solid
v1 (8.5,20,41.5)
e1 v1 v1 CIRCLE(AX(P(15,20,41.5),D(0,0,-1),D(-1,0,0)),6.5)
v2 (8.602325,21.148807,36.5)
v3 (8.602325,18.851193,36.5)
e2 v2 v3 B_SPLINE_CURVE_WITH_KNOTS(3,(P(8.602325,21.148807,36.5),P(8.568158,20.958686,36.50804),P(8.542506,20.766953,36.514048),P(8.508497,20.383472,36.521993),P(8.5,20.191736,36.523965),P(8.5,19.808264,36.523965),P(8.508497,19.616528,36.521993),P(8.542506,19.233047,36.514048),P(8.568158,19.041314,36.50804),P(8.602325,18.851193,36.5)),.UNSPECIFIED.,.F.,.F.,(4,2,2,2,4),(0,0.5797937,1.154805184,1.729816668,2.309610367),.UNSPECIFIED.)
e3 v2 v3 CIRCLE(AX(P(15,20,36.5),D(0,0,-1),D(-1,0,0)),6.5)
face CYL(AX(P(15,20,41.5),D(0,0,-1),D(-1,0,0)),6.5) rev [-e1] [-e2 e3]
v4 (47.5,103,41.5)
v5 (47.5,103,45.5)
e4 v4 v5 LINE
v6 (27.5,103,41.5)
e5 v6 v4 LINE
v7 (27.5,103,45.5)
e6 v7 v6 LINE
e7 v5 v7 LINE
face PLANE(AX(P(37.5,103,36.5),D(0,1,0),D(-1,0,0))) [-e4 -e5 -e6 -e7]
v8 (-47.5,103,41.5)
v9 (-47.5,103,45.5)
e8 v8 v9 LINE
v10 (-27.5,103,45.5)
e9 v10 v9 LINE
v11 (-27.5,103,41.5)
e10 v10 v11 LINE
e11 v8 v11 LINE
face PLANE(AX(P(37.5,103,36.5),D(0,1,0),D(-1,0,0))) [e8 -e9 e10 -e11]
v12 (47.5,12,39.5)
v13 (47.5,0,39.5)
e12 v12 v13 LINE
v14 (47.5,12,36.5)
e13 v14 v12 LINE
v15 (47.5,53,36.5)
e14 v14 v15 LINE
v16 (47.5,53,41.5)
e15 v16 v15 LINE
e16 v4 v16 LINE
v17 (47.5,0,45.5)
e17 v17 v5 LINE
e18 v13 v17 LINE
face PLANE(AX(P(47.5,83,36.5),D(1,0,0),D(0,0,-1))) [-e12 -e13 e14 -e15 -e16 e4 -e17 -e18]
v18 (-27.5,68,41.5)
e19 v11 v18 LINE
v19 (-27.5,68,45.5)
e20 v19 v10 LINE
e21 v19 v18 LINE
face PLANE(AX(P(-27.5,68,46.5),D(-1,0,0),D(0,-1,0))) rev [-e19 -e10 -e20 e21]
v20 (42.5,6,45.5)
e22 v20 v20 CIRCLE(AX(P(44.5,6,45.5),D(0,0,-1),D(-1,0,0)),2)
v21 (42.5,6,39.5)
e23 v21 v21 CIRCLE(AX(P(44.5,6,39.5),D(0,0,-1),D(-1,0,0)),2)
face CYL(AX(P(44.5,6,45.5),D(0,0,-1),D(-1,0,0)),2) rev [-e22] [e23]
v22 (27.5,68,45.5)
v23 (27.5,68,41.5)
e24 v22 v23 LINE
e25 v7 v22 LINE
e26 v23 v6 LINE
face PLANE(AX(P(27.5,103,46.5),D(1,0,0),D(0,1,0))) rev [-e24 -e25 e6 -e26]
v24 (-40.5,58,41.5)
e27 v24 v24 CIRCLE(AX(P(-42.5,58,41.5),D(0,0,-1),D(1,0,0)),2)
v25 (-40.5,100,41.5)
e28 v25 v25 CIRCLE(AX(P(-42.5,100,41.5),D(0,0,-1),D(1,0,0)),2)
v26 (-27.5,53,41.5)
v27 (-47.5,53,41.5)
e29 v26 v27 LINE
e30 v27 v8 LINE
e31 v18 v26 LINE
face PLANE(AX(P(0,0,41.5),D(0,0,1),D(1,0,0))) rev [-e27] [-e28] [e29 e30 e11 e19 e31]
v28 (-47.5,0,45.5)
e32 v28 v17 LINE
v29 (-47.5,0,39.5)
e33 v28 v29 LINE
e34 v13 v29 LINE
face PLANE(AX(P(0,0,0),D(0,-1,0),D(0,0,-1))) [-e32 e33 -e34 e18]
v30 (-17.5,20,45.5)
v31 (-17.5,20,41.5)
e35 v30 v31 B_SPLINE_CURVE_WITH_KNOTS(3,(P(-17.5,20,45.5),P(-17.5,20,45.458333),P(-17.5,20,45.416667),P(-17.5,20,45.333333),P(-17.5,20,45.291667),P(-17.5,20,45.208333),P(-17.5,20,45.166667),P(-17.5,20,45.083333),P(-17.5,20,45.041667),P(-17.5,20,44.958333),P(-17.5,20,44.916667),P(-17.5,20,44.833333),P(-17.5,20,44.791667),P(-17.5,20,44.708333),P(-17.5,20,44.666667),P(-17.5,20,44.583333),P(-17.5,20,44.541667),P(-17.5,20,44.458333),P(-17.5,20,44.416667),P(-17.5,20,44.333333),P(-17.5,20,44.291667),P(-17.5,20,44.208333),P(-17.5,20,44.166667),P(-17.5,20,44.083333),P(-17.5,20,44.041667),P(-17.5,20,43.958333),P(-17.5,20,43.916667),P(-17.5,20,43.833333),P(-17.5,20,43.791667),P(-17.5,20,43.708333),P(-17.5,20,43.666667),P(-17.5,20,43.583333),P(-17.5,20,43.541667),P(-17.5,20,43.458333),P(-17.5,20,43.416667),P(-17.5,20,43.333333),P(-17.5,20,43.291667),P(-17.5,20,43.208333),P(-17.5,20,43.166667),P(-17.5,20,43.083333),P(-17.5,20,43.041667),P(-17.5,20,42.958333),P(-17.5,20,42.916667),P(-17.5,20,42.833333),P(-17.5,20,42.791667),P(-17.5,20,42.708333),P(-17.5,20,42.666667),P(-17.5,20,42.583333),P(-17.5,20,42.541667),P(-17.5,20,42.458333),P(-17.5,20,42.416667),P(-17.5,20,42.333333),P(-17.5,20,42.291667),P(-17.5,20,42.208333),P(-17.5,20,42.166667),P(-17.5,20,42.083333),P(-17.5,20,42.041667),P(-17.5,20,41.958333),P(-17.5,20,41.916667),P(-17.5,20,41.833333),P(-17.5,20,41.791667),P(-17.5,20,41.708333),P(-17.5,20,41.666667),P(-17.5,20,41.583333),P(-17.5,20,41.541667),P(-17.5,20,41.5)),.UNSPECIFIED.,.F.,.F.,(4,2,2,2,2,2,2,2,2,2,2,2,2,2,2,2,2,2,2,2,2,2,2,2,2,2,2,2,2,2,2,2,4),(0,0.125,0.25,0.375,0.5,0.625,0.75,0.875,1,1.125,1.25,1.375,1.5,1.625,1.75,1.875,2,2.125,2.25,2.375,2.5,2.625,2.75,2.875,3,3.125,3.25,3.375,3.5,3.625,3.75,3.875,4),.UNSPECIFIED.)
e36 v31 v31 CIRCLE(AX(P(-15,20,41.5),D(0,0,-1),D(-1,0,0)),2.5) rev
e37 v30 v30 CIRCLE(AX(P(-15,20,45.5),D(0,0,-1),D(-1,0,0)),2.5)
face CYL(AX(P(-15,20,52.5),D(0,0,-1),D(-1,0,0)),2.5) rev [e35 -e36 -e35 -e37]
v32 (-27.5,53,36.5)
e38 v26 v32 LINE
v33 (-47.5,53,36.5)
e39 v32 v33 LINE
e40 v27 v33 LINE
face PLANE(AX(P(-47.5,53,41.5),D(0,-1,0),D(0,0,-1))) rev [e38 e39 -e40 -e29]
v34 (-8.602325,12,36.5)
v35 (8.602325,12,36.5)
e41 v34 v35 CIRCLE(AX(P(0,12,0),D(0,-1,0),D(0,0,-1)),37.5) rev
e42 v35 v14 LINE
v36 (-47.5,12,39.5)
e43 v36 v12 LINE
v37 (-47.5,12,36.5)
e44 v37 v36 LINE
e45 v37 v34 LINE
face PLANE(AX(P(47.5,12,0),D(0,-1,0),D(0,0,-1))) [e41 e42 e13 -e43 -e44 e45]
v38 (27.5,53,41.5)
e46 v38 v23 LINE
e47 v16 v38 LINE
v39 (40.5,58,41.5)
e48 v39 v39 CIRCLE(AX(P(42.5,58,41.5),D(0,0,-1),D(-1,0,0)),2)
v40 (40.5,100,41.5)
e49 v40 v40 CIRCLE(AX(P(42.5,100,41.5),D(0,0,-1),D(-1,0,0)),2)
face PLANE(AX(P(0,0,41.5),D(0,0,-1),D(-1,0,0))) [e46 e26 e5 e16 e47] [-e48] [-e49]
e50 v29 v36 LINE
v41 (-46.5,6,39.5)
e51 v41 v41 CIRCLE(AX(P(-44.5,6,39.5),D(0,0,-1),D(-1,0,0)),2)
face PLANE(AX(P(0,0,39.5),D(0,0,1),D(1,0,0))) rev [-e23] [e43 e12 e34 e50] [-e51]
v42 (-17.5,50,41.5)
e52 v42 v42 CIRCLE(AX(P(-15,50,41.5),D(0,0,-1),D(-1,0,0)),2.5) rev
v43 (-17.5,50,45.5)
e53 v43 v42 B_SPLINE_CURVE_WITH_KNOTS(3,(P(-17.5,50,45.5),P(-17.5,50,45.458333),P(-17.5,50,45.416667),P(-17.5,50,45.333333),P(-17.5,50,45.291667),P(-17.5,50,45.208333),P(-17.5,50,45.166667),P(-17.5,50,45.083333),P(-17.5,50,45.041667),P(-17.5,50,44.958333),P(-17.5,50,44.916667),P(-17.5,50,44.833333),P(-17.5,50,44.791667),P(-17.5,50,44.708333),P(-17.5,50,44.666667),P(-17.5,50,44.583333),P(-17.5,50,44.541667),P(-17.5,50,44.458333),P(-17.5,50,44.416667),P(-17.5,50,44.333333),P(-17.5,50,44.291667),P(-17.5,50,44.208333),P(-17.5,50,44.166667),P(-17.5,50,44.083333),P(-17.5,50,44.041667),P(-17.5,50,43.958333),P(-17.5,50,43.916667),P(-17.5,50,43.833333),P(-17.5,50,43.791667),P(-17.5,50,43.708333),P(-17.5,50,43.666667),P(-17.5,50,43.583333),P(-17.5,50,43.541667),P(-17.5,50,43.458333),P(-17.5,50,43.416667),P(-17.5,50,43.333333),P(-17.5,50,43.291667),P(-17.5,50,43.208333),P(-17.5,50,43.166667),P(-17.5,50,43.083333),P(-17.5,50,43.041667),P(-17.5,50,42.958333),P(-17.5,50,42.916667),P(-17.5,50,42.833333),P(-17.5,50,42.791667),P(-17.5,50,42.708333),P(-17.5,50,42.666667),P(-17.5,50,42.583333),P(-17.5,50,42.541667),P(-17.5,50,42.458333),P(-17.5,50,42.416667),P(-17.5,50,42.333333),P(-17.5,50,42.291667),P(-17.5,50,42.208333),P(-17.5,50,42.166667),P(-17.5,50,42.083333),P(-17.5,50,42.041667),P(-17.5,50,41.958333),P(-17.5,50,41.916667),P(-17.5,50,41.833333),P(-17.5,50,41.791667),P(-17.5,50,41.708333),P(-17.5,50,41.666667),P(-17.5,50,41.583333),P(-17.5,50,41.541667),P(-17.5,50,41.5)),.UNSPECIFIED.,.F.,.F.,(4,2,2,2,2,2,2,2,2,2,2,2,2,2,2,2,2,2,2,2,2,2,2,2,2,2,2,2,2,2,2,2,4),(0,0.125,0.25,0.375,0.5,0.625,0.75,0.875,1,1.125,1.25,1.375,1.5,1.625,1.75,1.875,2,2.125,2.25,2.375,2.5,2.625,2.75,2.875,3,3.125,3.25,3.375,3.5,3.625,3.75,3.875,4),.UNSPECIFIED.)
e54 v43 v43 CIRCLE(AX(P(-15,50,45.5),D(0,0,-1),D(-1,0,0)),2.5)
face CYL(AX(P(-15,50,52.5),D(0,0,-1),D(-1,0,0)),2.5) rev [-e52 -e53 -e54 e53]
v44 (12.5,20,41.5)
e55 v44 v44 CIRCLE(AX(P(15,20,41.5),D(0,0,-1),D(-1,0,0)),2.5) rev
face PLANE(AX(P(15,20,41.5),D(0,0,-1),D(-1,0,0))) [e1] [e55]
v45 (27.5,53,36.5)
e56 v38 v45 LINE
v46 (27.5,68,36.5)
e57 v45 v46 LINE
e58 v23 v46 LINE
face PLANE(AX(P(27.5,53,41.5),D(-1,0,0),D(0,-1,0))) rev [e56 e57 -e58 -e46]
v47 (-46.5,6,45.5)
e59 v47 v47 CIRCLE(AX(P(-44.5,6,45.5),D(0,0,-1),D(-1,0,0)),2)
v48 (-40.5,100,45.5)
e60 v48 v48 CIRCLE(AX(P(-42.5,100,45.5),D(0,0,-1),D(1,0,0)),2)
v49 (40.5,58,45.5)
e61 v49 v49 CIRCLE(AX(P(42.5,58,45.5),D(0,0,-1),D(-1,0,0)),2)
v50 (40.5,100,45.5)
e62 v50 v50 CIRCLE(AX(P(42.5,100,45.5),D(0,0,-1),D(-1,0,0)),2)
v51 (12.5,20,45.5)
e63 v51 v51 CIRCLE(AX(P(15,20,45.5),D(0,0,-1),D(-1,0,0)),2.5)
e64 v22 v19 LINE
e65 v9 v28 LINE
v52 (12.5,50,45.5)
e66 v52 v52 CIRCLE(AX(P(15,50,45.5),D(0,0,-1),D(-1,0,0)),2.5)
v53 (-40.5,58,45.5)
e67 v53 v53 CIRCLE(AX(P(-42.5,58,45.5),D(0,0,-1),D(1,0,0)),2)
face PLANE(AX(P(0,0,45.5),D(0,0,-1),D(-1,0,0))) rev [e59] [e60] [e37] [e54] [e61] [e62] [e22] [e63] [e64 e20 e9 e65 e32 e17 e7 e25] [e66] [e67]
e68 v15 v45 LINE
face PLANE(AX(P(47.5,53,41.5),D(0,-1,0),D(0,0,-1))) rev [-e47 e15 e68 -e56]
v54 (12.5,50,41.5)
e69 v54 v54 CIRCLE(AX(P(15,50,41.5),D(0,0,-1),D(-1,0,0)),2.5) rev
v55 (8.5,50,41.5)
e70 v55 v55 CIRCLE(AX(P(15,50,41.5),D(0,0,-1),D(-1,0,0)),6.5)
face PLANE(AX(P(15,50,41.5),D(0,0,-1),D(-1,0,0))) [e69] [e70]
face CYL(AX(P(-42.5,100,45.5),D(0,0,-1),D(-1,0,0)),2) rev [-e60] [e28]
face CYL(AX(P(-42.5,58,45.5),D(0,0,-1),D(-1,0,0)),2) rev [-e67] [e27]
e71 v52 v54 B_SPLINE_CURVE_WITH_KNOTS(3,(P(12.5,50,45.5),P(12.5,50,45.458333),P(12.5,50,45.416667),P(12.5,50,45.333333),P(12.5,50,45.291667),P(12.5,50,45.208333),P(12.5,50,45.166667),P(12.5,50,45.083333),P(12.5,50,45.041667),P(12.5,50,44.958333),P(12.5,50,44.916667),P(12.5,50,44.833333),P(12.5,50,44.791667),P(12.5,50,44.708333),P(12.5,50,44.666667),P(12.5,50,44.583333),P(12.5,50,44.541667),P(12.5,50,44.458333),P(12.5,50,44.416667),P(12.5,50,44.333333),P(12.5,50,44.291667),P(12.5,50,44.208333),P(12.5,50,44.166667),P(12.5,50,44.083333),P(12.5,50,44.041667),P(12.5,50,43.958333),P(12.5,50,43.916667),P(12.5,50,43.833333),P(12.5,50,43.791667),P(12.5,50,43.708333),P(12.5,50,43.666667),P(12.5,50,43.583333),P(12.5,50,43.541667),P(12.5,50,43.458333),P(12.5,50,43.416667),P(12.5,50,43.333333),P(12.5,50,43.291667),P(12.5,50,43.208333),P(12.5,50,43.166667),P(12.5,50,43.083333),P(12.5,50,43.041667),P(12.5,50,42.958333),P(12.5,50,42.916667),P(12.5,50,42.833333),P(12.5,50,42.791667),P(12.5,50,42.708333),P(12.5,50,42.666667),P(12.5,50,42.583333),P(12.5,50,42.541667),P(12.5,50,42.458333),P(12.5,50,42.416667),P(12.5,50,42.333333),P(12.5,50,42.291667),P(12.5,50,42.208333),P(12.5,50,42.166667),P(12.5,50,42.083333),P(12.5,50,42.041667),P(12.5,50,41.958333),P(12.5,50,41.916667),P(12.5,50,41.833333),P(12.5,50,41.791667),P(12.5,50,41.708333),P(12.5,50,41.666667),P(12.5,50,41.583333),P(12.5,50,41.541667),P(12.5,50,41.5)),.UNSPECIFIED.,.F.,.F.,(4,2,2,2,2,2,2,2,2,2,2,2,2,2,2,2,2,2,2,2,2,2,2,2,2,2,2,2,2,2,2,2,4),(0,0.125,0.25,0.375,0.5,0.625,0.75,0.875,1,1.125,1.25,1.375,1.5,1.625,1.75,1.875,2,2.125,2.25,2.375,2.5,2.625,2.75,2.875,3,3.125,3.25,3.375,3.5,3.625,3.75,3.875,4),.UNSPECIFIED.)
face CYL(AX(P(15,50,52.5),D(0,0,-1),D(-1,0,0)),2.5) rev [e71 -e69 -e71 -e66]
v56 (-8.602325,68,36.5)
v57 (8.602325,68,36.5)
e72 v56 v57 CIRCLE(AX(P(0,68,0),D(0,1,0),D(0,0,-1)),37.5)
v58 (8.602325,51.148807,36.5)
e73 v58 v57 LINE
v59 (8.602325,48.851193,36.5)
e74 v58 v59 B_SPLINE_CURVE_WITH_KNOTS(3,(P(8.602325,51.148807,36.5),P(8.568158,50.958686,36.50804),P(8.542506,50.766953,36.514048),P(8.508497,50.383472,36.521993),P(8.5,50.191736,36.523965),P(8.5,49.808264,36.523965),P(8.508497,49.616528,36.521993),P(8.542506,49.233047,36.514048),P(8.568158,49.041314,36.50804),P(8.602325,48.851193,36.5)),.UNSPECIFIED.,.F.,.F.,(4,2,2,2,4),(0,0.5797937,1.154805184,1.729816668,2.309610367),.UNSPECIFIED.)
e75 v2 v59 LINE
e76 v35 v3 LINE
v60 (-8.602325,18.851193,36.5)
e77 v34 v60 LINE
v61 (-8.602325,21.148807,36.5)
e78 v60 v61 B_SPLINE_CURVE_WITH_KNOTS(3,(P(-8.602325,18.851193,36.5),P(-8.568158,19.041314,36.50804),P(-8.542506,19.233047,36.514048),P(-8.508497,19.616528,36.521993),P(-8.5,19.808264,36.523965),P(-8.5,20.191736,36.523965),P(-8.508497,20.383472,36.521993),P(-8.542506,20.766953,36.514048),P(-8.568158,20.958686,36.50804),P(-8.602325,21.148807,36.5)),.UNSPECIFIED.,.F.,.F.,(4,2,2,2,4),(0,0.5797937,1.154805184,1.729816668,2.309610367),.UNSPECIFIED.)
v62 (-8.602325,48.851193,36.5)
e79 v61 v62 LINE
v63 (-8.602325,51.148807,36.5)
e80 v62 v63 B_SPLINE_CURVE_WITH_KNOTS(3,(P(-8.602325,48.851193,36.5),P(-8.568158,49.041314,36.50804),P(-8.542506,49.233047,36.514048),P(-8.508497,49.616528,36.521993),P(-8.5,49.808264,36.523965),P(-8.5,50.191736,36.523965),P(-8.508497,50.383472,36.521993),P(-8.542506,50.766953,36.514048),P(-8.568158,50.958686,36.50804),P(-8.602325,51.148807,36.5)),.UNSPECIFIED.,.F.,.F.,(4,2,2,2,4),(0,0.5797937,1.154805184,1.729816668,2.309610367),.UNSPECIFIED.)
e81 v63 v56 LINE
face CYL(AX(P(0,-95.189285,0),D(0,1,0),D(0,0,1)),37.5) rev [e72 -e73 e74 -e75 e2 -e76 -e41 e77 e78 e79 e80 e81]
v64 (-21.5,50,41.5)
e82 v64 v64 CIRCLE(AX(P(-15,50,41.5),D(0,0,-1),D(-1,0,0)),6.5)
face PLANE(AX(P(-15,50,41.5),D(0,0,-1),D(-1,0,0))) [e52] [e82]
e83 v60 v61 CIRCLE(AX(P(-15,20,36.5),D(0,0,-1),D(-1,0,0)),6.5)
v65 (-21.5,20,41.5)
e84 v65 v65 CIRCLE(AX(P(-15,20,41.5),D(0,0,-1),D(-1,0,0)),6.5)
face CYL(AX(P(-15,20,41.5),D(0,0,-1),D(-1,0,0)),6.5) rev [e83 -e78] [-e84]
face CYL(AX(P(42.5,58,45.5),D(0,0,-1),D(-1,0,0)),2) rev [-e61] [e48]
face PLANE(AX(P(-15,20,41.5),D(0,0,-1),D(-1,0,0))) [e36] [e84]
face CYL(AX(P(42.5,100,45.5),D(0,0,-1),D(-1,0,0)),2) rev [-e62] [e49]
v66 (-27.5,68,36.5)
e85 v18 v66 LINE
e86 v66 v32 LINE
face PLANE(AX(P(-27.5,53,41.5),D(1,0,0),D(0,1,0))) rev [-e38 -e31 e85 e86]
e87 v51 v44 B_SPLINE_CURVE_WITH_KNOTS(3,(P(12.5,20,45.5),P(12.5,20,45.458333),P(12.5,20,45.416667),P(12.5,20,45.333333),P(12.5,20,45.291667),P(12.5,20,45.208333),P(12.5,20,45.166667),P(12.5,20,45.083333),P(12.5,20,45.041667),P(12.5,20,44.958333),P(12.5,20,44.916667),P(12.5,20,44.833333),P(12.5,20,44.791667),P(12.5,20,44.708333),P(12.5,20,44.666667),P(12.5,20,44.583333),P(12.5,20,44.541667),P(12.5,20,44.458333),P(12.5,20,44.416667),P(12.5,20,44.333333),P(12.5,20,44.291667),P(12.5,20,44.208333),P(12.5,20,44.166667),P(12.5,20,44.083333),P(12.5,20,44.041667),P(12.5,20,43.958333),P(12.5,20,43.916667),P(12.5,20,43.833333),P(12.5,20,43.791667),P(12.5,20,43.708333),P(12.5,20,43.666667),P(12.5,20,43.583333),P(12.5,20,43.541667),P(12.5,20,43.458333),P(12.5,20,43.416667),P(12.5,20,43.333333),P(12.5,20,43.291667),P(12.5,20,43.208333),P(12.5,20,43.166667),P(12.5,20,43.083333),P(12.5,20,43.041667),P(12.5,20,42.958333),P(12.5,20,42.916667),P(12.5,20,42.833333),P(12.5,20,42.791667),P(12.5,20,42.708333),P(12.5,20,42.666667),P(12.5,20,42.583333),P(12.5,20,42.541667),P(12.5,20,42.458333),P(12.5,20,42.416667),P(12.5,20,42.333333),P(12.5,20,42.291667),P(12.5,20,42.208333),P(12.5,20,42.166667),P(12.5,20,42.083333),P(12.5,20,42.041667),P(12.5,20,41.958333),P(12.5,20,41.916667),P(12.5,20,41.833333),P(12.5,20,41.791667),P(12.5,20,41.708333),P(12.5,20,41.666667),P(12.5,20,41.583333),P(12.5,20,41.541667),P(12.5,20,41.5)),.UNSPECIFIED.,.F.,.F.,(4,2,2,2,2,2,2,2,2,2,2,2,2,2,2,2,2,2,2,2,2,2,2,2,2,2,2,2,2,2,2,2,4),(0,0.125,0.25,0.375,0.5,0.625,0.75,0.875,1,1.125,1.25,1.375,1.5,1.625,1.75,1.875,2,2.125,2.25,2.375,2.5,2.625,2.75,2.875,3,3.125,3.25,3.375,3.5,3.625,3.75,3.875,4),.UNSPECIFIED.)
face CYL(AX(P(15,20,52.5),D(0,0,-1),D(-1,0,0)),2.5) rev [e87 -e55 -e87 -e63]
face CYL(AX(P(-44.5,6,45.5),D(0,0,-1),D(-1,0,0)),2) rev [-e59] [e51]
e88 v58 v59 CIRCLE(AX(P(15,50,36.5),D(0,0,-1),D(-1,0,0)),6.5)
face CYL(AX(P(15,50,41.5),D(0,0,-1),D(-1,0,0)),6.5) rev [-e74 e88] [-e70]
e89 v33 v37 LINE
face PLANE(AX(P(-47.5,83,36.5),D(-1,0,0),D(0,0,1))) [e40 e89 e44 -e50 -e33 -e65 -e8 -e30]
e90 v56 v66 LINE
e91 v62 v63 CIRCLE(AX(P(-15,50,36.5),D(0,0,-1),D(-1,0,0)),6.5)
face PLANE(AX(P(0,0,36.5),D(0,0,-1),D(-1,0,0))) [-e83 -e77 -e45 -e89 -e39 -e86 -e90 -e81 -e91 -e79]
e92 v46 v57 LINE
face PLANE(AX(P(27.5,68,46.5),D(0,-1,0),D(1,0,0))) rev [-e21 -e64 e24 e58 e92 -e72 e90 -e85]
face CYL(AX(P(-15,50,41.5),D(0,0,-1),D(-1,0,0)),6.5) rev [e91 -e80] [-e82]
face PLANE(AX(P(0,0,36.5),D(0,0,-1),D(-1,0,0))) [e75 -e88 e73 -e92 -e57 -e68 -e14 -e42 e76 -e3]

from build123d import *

# Parameters (mm, degrees)
SKETCH1_R                = 37.5
BOSS_EXTRUDE1_DEPTH      = 12
SKETCH2_R                = 30
BOSS_EXTRUDE2_DEPTH      = 56
BOSS_EXTRUDE3_DEPTH      = 5
BOSS_EXTRUDE3_DEPTH_BACK = 1
SKETCH4_W                = 75
SKETCH4_H                = 15
SKETCH4_R                = 3.5
MOVE_FACE3_BY            = 10
MOVE_FACE3_2_BY          = 10
BOSS_EXTRUDE4_DEPTH      = 12
BOSS_EXTRUDE5_DEPTH      = 68
MOVE_FACE1_BY            = 10
SKETCH11_W               = 95
SKETCH11_H               = 15
BOSS_EXTRUDE7_DEPTH      = 20
CUT_EXTRUDE1_DEPTH       = 103.720494547
CUT_EXTRUDE1_DEPTH_BACK  = 103.720494547
SKETCH12_R               = 2.5
SKETCH13_R               = 6.5
CUT_EXTRUDE2_DEPTH       = 5
MOVE_FACE2_BY            = 7
DELETEFACE1_START        = -20
DELETEFACE1_OUTLINE_W    = 95
DELETEFACE1_OUTLINE_H    = 8
DELETEFACE1_DEPTH        = 20
CUT_EXTRUDE3_DEPTH       = 103.359660059
CUT_EXTRUDE3_DEPTH_BACK  = 3
SKETCH15_R               = 2
CUT_EXTRUDE4_DEPTH       = 96.818839484
MOVE_FACE4_BY            = 20
SKETCH16_W               = 55
SKETCH16_H               = 35
CUT_EXTRUDE5_DEPTH       = 10
SKETCH17_W               = 20
SKETCH17_H               = 50
CUT_EXTRUDE6_DEPTH       = 5
SKETCH18_R               = 2
CUT_EXTRUDE7_DEPTH       = 114.535236825


# Read off the part's stored shape, not the designer's step: DeleteFace1
with BuildPart() as part:
    # Sketch1 → Boss-Extrude1 (new body)
    with BuildSketch(Plane(origin=(0, 0, 0), x_dir=(1, 0, 0), z_dir=(0, 1, 0))):
        with Locations(Location((0, 0, 0), (0, 0, 270))):
            Circle(SKETCH1_R)
    extrude(amount=BOSS_EXTRUDE1_DEPTH)

    # Sketch2 → Boss-Extrude2 (add)
    with BuildSketch(Plane(origin=(0, 12, 0), x_dir=(1, 0, 0), z_dir=(0, 1, 0))):
        with Locations(Location((0, 0, 0), (0, 0, 270))):
            Circle(SKETCH2_R)
    extrude(amount=BOSS_EXTRUDE2_DEPTH)


with BuildPart() as body_2:
    # Sketch4 → Boss-Extrude3 (new, two sides: drawn at the far end of the back side and taken through both)
    with BuildSketch(Plane.XY.offset(37.5).offset(-BOSS_EXTRUDE3_DEPTH_BACK)):
        with Locations((0, 75.5)):
            Rectangle(SKETCH4_W, SKETCH4_H)
        with Locations((0, 76)):
            Circle(SKETCH4_R, mode=Mode.SUBTRACT)
    extrude(amount=BOSS_EXTRUDE3_DEPTH + BOSS_EXTRUDE3_DEPTH_BACK)

    # Move Face3: a face moved outward by 10.0
    extrude(body_2.faces().sort_by_distance((-37.5, 75.5, 39.5))[0], amount=MOVE_FACE3_BY, dir=(-1, 0, 0))

    # Move Face3 2: a face moved outward by 10.0
    extrude(body_2.faces().sort_by_distance((37.5, 75.5, 39.5))[0], amount=MOVE_FACE3_2_BY, dir=(1, 0, 0))



with BuildPart() as body_3:
    # Sketch6 → Boss-Extrude4 (new body)
    with BuildSketch(Plane.XZ):
        with BuildLine():
            Line((42.5, 0), (37.5, 0))
            ThreePointArc((37.5, 0), (0, 37.5), (-37.5, 0))
            Line((-37.5, 0), (-42.5, 0))
            ThreePointArc((-42.5, 0), (0, 42.5), (42.5, 0))
        make_face()
    extrude(amount=-BOSS_EXTRUDE4_DEPTH)


with BuildPart() as body_2_1:
    add(body_2.part)

    add(body_3.part)  # Boss-Extrude5 merges body 3
    # Sketch7 → Boss-Extrude5 (add)
    with BuildSketch(Plane.XZ.offset(-68)):
        with BuildLine():
            Line((8.602325267, 36.5), (47.5, 36.5))
            Line((47.5, 36.5), (47.5, 42.5))
            Line((47.5, 42.5), (-47.5, 42.5))
            Line((-47.5, 42.5), (-47.5, 36.5))
            Line((-47.5, 36.5), (-8.602325267, 36.5))
            ThreePointArc((-8.602325267, 36.5), (0, 37.5), (8.602325267, 36.5))
        make_face()
    extrude(amount=BOSS_EXTRUDE5_DEPTH)

    # Move Face1: a face moved outward by 10.0
    extrude(body_2_1.faces().sort_by_distance((0, 41.330789145, 42.5))[0], amount=MOVE_FACE1_BY, dir=(0, 0, 1))

    # Sketch11 → Boss-Extrude7 (add)
    with BuildSketch(Plane.XZ):
        with Locations((0, 45)):
            Rectangle(SKETCH11_W, SKETCH11_H)
    extrude(amount=BOSS_EXTRUDE7_DEPTH)

    # Sketch12 → Cut-Extrude1 (cut, two sides: drawn at the far end of the back side and taken through both)
    with BuildSketch(Plane(origin=(0, 0, 37.5), x_dir=(-1, 0, 0), z_dir=(0, 0, -1)).offset(-CUT_EXTRUDE1_DEPTH_BACK)):
        with Locations((-15, 20)):
            Circle(SKETCH12_R)
        with Locations((15, 20)):
            Circle(SKETCH12_R)
        with Locations((-15, 50)):
            Circle(SKETCH12_R)
        with Locations((15, 50)):
            Circle(SKETCH12_R)
    extrude(amount=CUT_EXTRUDE1_DEPTH + CUT_EXTRUDE1_DEPTH_BACK, mode=Mode.SUBTRACT)

    # Sketch13 → Cut-Extrude2 (cut)
    with BuildSketch(Plane(origin=(0, 0, 36.5), x_dir=(-1, 0, 0), z_dir=(0, 0, -1))):
        with Locations((-15, 50)):
            Circle(SKETCH13_R)
        with Locations((15, 50)):
            Circle(SKETCH13_R)
        with Locations((-15, 20)):
            Circle(SKETCH13_R)
        with Locations((15, 20)):
            Circle(SKETCH13_R)
    extrude(amount=-CUT_EXTRUDE2_DEPTH, mode=Mode.SUBTRACT)

    # Move Face2: a face moved inward by 7.0
    extrude(body_2_1.faces().sort_by_distance((0, 31.294429556, 52.5))[0], amount=MOVE_FACE2_BY, dir=(0, 0, -1), mode=Mode.SUBTRACT)

    # DeleteFace1 outline → DeleteFace1 (cut)
    with BuildSketch(Plane(origin=(0, 0, 0), x_dir=(1, 0, 0), z_dir=(0, 1, 0)).offset(DELETEFACE1_START)):
        with Locations((0, -41.5)):
            Rectangle(DELETEFACE1_OUTLINE_W, DELETEFACE1_OUTLINE_H)
    extrude(amount=DELETEFACE1_DEPTH, mode=Mode.SUBTRACT)

    # Sketch14 → Cut-Extrude3 (cut, two sides: drawn at the far end of the back side and taken through both)
    with BuildSketch(Plane(origin=(0, 0, 36.5), x_dir=(-1, 0, 0), z_dir=(0, 0, -1)).offset(-CUT_EXTRUDE3_DEPTH_BACK)):
        Polygon((47.5, 0), (-42.5, 0), (-47.5, 0), (-47.5, 12), (-42.5, 12), (47.5, 12), align=None)
    extrude(amount=CUT_EXTRUDE3_DEPTH + CUT_EXTRUDE3_DEPTH_BACK, mode=Mode.SUBTRACT)

    # Sketch15 → Cut-Extrude4 (cut, through all)
    with BuildSketch(Plane(origin=(0, 0, 39.5), x_dir=(-1, 0, 0), z_dir=(0, 0, -1))):
        with Locations((44.5, 6)):
            Circle(SKETCH15_R)
        with Locations((-44.5, 6)):
            Circle(SKETCH15_R)
    extrude(amount=-CUT_EXTRUDE4_DEPTH, mode=Mode.SUBTRACT)

    # Move Face4: a face moved outward by 20.0
    extrude(body_2_1.faces().sort_by_distance((0, 83, 41))[0], amount=MOVE_FACE4_BY, dir=(0, 1, 0))

    # Sketch16 → Cut-Extrude5 (cut)
    with BuildSketch(Plane(origin=(0, 0, 36.5), x_dir=(-1, 0, 0), z_dir=(0, 0, -1))):
        with Locations((0, 85.5)):
            Rectangle(SKETCH16_W, SKETCH16_H)
    extrude(amount=-CUT_EXTRUDE5_DEPTH, mode=Mode.SUBTRACT)

    # Sketch17 → Cut-Extrude6 (cut)
    with BuildSketch(Plane(origin=(0, 0, 36.5), x_dir=(-1, 0, 0), z_dir=(0, 0, -1))):
        with Locations((37.5, 78)):
            Rectangle(SKETCH17_W, SKETCH17_H)
        with Locations((-37.5, 78)):
            Rectangle(SKETCH17_W, SKETCH17_H)
    extrude(amount=-CUT_EXTRUDE6_DEPTH, mode=Mode.SUBTRACT)

    # Sketch18 → Cut-Extrude7 (cut, through all)
    with BuildSketch(Plane(origin=(0, 0, 41.5), x_dir=(-1, 0, 0), z_dir=(0, 0, -1))):
        with Locations((-42.5, 58)):
            Circle(SKETCH18_R)
        with Locations((-42.5, 100)):
            Circle(SKETCH18_R)
        with Locations(Location((42.5, 100, 0), (0, 0, 180))):
            Circle(SKETCH18_R)
        with Locations(Location((42.5, 58, 0), (0, 0, 180))):
            Circle(SKETCH18_R)
    extrude(amount=-CUT_EXTRUDE7_DEPTH, mode=Mode.SUBTRACT)


solid = body_2_1.part
